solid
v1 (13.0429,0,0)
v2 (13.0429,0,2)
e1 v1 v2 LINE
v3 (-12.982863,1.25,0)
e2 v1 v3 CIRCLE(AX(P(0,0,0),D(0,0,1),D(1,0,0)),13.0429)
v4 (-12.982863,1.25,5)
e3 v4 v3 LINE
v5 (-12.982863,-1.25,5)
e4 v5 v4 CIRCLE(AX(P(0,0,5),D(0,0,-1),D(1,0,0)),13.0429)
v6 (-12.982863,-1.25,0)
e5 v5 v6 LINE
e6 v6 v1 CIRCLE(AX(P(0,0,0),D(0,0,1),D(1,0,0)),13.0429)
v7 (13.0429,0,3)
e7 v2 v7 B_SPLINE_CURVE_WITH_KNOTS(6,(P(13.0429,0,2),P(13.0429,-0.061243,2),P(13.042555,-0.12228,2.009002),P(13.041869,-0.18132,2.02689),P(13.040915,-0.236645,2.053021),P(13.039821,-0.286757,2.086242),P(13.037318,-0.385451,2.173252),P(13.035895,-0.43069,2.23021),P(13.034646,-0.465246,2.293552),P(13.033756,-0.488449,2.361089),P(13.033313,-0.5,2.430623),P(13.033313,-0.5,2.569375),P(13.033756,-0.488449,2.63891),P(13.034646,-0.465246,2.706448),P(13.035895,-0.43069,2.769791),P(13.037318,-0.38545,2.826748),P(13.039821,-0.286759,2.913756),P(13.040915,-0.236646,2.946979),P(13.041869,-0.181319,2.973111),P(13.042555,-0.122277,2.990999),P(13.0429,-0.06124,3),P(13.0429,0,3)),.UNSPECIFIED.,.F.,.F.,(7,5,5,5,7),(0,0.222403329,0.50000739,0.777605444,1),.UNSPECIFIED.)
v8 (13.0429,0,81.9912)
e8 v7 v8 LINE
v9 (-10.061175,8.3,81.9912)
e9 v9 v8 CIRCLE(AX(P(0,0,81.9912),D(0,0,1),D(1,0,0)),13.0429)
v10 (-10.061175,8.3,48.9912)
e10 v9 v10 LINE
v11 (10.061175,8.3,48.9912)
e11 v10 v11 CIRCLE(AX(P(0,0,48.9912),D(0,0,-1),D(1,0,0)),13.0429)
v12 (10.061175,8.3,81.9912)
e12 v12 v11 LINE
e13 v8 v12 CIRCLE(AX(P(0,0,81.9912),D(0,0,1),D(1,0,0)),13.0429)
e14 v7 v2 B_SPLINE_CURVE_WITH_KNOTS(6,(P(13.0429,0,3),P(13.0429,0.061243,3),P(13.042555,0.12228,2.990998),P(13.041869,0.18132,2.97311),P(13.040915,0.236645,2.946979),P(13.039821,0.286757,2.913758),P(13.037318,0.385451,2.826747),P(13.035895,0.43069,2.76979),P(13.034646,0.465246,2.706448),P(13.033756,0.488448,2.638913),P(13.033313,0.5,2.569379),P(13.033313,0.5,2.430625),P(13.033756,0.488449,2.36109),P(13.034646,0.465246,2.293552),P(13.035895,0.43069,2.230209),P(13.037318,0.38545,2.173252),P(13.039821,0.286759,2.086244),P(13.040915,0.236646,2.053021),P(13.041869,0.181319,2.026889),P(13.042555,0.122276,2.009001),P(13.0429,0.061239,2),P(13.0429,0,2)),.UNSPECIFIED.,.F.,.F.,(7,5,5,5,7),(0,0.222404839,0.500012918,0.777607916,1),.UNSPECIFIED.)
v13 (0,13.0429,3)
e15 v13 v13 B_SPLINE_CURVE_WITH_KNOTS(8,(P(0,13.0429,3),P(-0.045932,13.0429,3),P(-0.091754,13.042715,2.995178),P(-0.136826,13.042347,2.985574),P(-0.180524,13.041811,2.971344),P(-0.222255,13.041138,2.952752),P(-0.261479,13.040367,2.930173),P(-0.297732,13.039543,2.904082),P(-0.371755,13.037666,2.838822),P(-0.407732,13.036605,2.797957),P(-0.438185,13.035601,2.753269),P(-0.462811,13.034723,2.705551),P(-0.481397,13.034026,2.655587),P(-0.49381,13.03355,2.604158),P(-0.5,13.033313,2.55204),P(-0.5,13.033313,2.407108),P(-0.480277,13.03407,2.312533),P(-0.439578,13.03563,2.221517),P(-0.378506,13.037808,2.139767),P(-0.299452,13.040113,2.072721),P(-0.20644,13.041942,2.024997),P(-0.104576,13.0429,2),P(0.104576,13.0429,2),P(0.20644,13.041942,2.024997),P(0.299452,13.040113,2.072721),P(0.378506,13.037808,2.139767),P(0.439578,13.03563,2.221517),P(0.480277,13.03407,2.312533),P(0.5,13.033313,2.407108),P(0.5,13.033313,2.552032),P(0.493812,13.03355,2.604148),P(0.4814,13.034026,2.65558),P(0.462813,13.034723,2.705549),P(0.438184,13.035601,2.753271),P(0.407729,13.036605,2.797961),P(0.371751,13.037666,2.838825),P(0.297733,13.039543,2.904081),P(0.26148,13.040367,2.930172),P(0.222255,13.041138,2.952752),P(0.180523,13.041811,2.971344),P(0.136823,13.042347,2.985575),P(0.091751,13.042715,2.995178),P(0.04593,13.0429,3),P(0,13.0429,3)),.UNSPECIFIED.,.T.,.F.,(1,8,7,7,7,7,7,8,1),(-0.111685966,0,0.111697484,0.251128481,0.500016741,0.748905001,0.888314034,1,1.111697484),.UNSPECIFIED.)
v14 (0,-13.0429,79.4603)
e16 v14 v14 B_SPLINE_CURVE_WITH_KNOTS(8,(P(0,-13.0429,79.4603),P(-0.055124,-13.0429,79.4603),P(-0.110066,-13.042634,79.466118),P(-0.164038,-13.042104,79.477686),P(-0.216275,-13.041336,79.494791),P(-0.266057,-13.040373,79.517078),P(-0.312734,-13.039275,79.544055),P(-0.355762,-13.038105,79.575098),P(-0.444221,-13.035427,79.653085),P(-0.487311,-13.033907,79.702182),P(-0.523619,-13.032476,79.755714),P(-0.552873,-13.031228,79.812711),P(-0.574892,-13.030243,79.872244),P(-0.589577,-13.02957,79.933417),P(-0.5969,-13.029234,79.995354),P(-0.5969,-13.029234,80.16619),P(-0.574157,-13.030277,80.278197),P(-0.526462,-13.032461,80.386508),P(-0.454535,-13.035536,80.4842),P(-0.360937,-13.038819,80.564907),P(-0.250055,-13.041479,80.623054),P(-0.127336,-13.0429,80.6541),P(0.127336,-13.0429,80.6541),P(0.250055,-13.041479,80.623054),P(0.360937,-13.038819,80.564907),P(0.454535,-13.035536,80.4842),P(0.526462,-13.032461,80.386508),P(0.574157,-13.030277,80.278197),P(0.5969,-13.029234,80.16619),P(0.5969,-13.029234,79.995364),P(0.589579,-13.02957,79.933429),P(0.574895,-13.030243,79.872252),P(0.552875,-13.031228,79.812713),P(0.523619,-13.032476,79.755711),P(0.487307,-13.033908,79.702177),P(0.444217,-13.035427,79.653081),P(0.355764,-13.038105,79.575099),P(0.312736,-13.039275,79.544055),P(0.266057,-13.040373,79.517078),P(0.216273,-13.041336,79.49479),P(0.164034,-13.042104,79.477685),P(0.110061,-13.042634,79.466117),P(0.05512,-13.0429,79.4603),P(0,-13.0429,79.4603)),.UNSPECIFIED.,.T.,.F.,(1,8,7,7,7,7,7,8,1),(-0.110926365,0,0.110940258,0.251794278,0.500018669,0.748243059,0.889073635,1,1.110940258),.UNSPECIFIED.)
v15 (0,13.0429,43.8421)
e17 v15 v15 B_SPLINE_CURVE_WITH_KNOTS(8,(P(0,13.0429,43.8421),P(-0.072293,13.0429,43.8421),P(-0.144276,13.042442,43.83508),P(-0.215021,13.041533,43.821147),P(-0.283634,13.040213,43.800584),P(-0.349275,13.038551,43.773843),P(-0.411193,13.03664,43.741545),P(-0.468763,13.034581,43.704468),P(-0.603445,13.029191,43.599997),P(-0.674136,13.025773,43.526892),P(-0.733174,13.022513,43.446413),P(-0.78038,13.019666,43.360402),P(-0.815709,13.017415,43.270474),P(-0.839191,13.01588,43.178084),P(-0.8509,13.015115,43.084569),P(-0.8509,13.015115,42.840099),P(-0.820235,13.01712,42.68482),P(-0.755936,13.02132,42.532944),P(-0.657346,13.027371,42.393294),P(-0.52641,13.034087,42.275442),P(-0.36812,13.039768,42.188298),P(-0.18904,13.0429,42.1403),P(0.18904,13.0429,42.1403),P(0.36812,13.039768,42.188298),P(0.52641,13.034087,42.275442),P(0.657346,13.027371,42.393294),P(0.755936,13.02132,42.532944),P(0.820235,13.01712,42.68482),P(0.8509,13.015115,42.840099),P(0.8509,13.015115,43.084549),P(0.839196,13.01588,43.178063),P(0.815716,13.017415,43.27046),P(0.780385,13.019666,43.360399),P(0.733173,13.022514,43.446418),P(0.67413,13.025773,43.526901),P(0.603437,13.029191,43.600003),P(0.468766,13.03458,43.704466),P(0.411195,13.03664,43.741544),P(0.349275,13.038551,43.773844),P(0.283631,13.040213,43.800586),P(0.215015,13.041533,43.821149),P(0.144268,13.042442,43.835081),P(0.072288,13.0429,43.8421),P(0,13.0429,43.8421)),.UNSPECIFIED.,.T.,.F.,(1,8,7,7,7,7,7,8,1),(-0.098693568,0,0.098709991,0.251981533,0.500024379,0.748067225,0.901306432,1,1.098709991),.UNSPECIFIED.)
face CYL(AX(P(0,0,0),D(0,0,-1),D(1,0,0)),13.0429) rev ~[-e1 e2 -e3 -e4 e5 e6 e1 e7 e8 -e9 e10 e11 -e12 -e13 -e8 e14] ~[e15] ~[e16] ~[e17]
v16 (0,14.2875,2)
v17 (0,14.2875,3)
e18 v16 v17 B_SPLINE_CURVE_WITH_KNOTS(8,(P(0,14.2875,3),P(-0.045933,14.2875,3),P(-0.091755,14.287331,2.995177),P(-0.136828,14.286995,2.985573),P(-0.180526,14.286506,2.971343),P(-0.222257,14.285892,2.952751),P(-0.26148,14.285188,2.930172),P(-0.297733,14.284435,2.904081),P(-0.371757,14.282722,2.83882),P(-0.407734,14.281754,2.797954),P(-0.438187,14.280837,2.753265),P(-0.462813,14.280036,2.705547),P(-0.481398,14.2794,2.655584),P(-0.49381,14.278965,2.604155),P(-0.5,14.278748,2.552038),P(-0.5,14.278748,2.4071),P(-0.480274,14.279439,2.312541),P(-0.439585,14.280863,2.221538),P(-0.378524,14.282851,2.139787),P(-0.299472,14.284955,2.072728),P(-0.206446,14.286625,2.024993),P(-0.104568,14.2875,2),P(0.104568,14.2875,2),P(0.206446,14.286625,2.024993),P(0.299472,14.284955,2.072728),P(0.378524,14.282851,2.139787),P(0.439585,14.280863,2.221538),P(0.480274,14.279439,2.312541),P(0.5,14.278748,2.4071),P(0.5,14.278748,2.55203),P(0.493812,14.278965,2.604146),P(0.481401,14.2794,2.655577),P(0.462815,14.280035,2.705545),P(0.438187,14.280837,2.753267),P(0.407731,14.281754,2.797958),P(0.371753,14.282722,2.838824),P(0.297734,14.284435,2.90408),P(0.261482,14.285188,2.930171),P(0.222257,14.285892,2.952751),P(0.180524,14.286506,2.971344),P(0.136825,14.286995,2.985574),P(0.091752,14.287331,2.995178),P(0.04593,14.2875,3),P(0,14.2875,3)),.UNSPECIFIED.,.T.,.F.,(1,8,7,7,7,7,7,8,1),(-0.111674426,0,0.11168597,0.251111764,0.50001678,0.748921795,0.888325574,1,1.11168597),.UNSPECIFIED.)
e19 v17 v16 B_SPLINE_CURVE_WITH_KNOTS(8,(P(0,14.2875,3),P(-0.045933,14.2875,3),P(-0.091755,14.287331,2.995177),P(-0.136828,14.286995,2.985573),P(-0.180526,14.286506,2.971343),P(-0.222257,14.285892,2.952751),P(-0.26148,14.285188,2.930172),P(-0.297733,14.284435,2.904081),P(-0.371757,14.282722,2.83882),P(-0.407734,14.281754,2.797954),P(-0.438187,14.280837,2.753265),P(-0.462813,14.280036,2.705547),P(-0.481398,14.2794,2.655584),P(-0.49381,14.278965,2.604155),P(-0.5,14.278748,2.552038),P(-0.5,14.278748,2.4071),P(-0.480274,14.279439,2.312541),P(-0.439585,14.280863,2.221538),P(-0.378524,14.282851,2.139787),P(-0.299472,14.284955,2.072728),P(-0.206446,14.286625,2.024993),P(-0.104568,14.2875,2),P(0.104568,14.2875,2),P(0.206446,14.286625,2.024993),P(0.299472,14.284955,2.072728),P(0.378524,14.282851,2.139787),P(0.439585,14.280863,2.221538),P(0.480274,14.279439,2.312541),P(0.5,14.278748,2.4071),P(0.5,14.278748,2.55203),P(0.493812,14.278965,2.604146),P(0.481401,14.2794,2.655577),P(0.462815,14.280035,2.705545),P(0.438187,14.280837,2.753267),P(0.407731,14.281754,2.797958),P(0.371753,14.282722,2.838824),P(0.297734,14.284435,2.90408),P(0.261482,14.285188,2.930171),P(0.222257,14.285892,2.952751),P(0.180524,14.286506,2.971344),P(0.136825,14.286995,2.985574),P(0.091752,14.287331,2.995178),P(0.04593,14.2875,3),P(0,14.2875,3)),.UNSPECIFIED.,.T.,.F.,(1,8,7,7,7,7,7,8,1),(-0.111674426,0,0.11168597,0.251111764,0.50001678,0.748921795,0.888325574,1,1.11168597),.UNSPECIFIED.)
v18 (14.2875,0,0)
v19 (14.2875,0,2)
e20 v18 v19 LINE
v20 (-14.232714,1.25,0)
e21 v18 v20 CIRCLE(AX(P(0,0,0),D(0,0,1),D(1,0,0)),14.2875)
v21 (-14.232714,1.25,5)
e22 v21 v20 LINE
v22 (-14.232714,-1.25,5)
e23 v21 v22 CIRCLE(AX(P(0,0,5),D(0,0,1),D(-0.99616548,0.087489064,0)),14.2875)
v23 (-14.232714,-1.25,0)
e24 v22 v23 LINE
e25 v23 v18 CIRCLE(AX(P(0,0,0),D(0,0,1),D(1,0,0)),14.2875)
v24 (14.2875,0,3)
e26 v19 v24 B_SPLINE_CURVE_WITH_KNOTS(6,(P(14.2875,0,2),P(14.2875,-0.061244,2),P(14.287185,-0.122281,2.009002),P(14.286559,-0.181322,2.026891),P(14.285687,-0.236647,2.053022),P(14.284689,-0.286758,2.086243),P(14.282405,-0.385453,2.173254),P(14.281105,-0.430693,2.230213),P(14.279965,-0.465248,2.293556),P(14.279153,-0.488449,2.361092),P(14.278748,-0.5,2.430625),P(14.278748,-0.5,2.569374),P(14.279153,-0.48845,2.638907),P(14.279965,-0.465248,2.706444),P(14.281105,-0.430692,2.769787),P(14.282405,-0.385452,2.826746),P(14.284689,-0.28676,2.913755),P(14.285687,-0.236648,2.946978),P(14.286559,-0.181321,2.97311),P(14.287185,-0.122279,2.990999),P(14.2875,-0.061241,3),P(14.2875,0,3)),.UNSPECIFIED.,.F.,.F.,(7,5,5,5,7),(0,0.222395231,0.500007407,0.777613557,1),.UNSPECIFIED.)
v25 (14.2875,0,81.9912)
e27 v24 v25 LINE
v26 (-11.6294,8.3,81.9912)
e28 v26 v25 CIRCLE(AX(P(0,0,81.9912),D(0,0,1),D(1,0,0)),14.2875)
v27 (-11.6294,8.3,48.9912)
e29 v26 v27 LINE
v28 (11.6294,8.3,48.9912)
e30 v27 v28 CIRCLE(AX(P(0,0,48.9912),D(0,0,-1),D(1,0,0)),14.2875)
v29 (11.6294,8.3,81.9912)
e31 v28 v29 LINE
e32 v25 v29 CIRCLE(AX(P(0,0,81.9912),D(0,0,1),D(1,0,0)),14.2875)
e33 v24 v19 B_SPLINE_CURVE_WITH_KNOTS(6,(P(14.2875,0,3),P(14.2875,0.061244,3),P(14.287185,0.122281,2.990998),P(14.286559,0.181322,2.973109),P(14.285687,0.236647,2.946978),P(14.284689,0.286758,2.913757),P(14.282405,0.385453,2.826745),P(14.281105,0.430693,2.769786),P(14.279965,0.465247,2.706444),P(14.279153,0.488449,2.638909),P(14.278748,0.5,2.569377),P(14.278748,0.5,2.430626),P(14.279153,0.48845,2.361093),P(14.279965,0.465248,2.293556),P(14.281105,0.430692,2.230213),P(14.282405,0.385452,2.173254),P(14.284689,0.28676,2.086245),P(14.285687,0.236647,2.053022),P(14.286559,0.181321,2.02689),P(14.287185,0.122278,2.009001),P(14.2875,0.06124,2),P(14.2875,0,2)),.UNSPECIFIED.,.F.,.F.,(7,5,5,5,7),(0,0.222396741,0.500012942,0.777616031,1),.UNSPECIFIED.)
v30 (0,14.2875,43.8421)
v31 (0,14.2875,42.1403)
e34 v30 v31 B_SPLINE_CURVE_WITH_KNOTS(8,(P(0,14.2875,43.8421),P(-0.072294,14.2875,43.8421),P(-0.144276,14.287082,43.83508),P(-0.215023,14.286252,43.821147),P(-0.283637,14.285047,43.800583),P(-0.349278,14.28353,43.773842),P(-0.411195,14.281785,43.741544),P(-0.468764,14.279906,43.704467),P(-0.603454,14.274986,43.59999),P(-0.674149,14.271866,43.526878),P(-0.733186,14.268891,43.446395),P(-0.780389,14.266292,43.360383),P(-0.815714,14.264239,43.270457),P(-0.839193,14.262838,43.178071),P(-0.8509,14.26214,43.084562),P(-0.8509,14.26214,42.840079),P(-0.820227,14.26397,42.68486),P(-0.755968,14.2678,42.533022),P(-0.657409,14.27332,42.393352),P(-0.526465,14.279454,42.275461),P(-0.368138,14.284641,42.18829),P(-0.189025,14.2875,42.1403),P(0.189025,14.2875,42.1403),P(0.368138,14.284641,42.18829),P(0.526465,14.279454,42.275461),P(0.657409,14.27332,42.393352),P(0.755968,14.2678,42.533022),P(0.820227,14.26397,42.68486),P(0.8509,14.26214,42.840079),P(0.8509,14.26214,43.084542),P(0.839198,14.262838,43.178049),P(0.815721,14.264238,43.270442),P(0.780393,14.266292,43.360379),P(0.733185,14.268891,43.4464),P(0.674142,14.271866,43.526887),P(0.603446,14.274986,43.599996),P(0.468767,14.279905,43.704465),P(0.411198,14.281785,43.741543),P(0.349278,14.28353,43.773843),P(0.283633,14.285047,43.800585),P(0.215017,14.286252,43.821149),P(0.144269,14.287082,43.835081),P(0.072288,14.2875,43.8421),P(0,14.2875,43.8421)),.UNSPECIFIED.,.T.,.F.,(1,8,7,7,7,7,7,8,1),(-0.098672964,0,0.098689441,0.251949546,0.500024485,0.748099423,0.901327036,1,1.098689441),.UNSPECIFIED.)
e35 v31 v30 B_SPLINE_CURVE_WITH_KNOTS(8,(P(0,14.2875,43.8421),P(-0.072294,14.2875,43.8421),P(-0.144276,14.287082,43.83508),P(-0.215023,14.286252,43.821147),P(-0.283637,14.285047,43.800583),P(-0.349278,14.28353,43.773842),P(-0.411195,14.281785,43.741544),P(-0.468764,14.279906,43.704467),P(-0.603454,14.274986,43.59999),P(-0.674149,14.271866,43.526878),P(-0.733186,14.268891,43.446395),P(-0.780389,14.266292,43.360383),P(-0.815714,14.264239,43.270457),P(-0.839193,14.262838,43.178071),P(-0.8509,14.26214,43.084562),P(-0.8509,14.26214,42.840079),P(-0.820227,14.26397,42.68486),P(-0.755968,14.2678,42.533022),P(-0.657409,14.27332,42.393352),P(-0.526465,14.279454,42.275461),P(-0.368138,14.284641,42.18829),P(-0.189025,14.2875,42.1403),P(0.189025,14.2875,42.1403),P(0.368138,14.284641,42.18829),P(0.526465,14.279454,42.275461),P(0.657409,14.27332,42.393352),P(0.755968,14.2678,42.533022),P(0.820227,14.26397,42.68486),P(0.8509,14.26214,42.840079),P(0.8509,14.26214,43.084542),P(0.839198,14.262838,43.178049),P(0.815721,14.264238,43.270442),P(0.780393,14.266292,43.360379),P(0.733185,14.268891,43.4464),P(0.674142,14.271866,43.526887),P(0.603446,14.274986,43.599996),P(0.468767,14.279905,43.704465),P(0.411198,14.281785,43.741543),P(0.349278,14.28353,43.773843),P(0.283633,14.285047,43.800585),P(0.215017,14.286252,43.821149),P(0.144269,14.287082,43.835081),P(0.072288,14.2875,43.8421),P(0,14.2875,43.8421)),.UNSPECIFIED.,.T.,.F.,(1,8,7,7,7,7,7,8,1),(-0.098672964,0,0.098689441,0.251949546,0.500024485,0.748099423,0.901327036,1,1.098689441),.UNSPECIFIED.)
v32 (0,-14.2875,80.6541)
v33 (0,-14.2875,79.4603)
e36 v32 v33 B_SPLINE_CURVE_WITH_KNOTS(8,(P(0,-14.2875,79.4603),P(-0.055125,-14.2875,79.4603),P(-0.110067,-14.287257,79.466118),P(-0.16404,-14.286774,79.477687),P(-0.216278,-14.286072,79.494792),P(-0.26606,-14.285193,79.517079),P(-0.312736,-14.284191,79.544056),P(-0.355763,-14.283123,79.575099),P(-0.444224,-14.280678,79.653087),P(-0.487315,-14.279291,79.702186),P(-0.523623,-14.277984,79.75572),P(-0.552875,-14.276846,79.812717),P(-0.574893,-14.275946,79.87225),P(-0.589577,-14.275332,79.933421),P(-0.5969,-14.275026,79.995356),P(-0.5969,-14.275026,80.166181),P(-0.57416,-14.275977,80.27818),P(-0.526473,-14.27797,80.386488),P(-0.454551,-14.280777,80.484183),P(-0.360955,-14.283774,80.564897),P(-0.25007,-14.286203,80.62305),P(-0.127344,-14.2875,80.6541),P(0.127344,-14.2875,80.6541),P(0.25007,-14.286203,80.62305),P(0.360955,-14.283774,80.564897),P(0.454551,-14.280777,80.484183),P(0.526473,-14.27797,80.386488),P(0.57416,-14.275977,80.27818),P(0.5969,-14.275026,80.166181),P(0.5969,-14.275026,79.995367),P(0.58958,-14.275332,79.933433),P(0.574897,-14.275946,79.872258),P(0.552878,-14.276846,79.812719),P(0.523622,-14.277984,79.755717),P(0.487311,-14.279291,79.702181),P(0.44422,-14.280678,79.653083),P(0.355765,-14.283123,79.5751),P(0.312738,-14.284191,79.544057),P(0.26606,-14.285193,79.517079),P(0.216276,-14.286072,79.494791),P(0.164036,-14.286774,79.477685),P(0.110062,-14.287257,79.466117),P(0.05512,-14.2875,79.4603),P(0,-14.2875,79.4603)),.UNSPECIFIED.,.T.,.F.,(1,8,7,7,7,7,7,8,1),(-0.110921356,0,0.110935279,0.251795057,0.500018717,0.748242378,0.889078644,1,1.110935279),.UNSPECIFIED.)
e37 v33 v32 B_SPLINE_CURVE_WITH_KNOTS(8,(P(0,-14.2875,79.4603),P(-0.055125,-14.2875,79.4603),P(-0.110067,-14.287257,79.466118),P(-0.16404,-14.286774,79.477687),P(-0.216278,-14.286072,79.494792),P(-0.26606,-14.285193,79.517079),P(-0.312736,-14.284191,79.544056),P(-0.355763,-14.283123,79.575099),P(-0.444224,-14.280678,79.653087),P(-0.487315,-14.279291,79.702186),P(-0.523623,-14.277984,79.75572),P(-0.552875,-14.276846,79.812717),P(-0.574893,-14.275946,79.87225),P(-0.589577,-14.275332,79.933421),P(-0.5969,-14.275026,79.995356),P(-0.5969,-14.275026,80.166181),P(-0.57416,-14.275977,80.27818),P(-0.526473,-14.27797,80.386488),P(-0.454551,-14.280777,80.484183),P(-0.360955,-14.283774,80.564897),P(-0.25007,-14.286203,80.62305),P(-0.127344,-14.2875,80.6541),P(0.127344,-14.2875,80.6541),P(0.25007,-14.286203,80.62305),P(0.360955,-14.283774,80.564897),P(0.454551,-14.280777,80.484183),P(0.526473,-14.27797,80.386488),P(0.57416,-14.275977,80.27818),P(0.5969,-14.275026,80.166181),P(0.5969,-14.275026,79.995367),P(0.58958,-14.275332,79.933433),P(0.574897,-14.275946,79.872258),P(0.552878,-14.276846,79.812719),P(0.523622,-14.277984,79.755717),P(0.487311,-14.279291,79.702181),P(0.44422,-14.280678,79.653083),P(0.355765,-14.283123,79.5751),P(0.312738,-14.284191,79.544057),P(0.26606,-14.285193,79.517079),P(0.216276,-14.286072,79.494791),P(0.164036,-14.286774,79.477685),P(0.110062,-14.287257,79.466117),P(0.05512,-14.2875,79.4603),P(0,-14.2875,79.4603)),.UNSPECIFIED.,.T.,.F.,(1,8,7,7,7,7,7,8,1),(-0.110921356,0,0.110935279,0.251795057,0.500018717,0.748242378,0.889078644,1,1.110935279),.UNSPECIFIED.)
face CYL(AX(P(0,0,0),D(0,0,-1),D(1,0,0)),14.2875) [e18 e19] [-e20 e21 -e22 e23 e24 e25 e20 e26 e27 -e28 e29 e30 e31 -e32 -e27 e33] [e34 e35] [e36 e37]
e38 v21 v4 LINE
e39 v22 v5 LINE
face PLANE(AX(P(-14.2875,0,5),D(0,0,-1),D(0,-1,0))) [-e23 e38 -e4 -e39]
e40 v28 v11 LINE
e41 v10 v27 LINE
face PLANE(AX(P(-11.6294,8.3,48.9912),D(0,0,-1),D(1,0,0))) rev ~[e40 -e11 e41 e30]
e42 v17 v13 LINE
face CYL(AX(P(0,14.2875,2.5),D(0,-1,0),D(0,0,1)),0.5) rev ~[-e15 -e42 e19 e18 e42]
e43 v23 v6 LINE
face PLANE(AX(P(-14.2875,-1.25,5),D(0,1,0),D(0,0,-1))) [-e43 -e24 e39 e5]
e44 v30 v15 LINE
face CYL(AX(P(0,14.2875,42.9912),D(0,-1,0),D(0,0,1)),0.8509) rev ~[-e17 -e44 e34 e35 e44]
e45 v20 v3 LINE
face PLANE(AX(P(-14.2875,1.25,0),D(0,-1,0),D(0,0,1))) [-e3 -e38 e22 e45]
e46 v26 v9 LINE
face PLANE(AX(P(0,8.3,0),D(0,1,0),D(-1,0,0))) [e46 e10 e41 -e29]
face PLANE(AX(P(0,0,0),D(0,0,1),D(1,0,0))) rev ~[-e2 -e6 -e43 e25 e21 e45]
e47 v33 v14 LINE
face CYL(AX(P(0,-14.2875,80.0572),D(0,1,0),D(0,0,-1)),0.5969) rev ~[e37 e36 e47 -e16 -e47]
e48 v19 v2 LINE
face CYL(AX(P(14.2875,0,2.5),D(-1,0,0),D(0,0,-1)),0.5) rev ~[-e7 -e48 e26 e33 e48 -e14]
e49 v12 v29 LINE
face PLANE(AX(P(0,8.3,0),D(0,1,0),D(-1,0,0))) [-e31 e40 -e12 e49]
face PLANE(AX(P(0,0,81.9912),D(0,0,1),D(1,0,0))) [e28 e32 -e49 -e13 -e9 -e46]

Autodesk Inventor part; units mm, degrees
sketch "Sketch1" plane through (0, 0, 0) normal (0, 0, 1) x (1, 0, 0)
  circle A0 centre (0, 0) radius 14.2875
  circle A1 centre (0, 0) radius 13.0429
  dimension "d0" = 28.575
  dimension "d1" = 26.0858
extrude "Extrusion1" add sketch "Sketch1" along normal blind 81.9912
ref_plane "POffset" through (0, 8.3, 0) normal (0, 1, 0) x (-1, 0, 0)
sketch "Sketch2" plane through (0, 8.3, 0) normal (0, 1, 0) x (-1, 0, 0)
  line L0 (11.6294, 81.9912) -> (11.6294, 0) projected
  line L1 (11.6294, 0) -> (10.0612, 0) projected
  line L2 (10.0612, 0) -> (10.0612, 81.9912) projected
  line L3 (10.0612, 81.9912) -> (11.6294, 81.9912) projected
  line L4 (-11.6294, 0) -> (-11.6294, 81.9912) projected
  line L5 (-11.6294, 81.9912) -> (-10.0612, 81.9912) projected
  line L6 (-10.0612, 81.9912) -> (-10.0612, 0) projected
  line L7 (-10.0612, 0) -> (-11.6294, 0) projected
  line L8 (-11.6294, 81.9912) -> (11.6294, 81.9912)
  line L9 (11.6294, 81.9912) -> (11.6294, 48.9912)
  line L10 (11.6294, 48.9912) -> (-11.6294, 48.9912)
  line L11 (-11.6294, 48.9912) -> (-11.6294, 81.9912)
  point P0 (0, 0)
  dimension "d5" = 33
extrude "Extrusion2" cut sketch "Sketch2" along normal through all contours L0 L10 L2 L3 | L2 L10 L6 L8 | L6 L10 L4 L5
ref_plane "Work Plane2" through (0, 14.2875, 0) normal (0, 1, 0) x (-1, 0, 0)
sketch "Sketch3" plane through (0, 14.2875, 0) normal (0, 1, 0) x (-1, 0, 0)
  line L0 (-14.2875, 0) -> (14.2875, 0) projected
  line L1 (0, -16.3982) -> (0, 98.3894) projected
  point P0 (0, 0)
  point P1 (0, 2.5)
  dimension "d8" = 2.5
hole "Hole1" at (0, 14.2875, 2.5) direction (0, -1, 0) diameter 1 end up to surface
ref_plane "Work Plane3" through (14.2875, 0, 0) normal (1, 0, 0) x (0, 1, 0)
sketch "Sketch4" plane through (14.2875, 0, 0) normal (1, 0, 0) x (0, 1, 0)
  line L0 (-14.2875, 0) -> (14.2875, 0) projected
  line L1 (0, -16.3982) -> (0, 98.3894) projected
  point P0 (0, 0)
  point P1 (0, 2.5)
  dimension "d16" = 2.5
hole "Hole2" at (14.2875, 0, 2.5) direction (-1, 0, 0) diameter 1 end up to surface
ref_plane "Work Plane4" through (-14.2875, 0, 0) normal (1, 0, 0) x (0, 1, 0)
sketch "Sketch5" plane through (-14.2875, 0, 0) normal (1, 0, 0) x (0, 1, 0)
  line L0 (-14.2875, 0) -> (14.2875, 0) projected
  line L1 (0, -16.3982) -> (0, 98.3894) projected
  line L2 (1.25, 5) -> (-1.25, 5)
  line L3 (-1.25, 5) -> (-1.25, 0)
  line L4 (-1.25, 0) -> (1.25, 0)
  line L5 (1.25, 0) -> (1.25, 5)
  point P0 (0, 0)
  point P1 (0, 5)
  point P2 (0, 0)
  dimension "d24" = 2.5
  dimension "d25" = 5
extrude "Extrusion3" cut sketch "Sketch5" along normal blind 3
ref_plane "Work Plane5" through (0, -14.2875, 0) normal (0, 1, 0) x (-1, 0, 0)
sketch "Sketch6" plane through (0, -14.2875, 0) normal (0, 1, 0) x (-1, 0, 0)
  line L0 (-13.0429, 81.9912) -> (13.0429, 81.9912) projected
  line L1 (0, -16.3982) -> (0, 98.3894) projected
  point P0 (0, 0)
  point P1 (-10.0612, 81.9912)
  point P2 (10.0612, 81.9912)
  point P3 (0, 80.0572)
  dimension "d28" = 1.934
hole "Hole3" at (0, -14.2875, 80.0572) direction (0, 1, 0) diameter 1.1938 end through all
sketch "Sketch7" plane through (0, 14.2875, 0) normal (0, 1, 0) x (-1, 0, 0)
  line L0 (-13.0429, 81.9912) -> (13.0429, 81.9912) projected
  line L1 (0, -16.3982) -> (0, 98.3894) projected
  point P0 (0, 0)
  point P1 (-10.0612, 81.9912)
  point P2 (10.0612, 81.9912)
  point P3 (0, 42.9912)
  dimension "d36" = 39
hole "Hole4" at (0, 14.2875, 42.9912) direction (0, -1, 0) diameter 1.7018 depth 3
equation "\"d5\" = length"
equation "\"POffset\" = 8.3"
equation "\"d4\" = POffset"
equation "\"length\" = 33"
properties part number "Main_Tubing_Al"
